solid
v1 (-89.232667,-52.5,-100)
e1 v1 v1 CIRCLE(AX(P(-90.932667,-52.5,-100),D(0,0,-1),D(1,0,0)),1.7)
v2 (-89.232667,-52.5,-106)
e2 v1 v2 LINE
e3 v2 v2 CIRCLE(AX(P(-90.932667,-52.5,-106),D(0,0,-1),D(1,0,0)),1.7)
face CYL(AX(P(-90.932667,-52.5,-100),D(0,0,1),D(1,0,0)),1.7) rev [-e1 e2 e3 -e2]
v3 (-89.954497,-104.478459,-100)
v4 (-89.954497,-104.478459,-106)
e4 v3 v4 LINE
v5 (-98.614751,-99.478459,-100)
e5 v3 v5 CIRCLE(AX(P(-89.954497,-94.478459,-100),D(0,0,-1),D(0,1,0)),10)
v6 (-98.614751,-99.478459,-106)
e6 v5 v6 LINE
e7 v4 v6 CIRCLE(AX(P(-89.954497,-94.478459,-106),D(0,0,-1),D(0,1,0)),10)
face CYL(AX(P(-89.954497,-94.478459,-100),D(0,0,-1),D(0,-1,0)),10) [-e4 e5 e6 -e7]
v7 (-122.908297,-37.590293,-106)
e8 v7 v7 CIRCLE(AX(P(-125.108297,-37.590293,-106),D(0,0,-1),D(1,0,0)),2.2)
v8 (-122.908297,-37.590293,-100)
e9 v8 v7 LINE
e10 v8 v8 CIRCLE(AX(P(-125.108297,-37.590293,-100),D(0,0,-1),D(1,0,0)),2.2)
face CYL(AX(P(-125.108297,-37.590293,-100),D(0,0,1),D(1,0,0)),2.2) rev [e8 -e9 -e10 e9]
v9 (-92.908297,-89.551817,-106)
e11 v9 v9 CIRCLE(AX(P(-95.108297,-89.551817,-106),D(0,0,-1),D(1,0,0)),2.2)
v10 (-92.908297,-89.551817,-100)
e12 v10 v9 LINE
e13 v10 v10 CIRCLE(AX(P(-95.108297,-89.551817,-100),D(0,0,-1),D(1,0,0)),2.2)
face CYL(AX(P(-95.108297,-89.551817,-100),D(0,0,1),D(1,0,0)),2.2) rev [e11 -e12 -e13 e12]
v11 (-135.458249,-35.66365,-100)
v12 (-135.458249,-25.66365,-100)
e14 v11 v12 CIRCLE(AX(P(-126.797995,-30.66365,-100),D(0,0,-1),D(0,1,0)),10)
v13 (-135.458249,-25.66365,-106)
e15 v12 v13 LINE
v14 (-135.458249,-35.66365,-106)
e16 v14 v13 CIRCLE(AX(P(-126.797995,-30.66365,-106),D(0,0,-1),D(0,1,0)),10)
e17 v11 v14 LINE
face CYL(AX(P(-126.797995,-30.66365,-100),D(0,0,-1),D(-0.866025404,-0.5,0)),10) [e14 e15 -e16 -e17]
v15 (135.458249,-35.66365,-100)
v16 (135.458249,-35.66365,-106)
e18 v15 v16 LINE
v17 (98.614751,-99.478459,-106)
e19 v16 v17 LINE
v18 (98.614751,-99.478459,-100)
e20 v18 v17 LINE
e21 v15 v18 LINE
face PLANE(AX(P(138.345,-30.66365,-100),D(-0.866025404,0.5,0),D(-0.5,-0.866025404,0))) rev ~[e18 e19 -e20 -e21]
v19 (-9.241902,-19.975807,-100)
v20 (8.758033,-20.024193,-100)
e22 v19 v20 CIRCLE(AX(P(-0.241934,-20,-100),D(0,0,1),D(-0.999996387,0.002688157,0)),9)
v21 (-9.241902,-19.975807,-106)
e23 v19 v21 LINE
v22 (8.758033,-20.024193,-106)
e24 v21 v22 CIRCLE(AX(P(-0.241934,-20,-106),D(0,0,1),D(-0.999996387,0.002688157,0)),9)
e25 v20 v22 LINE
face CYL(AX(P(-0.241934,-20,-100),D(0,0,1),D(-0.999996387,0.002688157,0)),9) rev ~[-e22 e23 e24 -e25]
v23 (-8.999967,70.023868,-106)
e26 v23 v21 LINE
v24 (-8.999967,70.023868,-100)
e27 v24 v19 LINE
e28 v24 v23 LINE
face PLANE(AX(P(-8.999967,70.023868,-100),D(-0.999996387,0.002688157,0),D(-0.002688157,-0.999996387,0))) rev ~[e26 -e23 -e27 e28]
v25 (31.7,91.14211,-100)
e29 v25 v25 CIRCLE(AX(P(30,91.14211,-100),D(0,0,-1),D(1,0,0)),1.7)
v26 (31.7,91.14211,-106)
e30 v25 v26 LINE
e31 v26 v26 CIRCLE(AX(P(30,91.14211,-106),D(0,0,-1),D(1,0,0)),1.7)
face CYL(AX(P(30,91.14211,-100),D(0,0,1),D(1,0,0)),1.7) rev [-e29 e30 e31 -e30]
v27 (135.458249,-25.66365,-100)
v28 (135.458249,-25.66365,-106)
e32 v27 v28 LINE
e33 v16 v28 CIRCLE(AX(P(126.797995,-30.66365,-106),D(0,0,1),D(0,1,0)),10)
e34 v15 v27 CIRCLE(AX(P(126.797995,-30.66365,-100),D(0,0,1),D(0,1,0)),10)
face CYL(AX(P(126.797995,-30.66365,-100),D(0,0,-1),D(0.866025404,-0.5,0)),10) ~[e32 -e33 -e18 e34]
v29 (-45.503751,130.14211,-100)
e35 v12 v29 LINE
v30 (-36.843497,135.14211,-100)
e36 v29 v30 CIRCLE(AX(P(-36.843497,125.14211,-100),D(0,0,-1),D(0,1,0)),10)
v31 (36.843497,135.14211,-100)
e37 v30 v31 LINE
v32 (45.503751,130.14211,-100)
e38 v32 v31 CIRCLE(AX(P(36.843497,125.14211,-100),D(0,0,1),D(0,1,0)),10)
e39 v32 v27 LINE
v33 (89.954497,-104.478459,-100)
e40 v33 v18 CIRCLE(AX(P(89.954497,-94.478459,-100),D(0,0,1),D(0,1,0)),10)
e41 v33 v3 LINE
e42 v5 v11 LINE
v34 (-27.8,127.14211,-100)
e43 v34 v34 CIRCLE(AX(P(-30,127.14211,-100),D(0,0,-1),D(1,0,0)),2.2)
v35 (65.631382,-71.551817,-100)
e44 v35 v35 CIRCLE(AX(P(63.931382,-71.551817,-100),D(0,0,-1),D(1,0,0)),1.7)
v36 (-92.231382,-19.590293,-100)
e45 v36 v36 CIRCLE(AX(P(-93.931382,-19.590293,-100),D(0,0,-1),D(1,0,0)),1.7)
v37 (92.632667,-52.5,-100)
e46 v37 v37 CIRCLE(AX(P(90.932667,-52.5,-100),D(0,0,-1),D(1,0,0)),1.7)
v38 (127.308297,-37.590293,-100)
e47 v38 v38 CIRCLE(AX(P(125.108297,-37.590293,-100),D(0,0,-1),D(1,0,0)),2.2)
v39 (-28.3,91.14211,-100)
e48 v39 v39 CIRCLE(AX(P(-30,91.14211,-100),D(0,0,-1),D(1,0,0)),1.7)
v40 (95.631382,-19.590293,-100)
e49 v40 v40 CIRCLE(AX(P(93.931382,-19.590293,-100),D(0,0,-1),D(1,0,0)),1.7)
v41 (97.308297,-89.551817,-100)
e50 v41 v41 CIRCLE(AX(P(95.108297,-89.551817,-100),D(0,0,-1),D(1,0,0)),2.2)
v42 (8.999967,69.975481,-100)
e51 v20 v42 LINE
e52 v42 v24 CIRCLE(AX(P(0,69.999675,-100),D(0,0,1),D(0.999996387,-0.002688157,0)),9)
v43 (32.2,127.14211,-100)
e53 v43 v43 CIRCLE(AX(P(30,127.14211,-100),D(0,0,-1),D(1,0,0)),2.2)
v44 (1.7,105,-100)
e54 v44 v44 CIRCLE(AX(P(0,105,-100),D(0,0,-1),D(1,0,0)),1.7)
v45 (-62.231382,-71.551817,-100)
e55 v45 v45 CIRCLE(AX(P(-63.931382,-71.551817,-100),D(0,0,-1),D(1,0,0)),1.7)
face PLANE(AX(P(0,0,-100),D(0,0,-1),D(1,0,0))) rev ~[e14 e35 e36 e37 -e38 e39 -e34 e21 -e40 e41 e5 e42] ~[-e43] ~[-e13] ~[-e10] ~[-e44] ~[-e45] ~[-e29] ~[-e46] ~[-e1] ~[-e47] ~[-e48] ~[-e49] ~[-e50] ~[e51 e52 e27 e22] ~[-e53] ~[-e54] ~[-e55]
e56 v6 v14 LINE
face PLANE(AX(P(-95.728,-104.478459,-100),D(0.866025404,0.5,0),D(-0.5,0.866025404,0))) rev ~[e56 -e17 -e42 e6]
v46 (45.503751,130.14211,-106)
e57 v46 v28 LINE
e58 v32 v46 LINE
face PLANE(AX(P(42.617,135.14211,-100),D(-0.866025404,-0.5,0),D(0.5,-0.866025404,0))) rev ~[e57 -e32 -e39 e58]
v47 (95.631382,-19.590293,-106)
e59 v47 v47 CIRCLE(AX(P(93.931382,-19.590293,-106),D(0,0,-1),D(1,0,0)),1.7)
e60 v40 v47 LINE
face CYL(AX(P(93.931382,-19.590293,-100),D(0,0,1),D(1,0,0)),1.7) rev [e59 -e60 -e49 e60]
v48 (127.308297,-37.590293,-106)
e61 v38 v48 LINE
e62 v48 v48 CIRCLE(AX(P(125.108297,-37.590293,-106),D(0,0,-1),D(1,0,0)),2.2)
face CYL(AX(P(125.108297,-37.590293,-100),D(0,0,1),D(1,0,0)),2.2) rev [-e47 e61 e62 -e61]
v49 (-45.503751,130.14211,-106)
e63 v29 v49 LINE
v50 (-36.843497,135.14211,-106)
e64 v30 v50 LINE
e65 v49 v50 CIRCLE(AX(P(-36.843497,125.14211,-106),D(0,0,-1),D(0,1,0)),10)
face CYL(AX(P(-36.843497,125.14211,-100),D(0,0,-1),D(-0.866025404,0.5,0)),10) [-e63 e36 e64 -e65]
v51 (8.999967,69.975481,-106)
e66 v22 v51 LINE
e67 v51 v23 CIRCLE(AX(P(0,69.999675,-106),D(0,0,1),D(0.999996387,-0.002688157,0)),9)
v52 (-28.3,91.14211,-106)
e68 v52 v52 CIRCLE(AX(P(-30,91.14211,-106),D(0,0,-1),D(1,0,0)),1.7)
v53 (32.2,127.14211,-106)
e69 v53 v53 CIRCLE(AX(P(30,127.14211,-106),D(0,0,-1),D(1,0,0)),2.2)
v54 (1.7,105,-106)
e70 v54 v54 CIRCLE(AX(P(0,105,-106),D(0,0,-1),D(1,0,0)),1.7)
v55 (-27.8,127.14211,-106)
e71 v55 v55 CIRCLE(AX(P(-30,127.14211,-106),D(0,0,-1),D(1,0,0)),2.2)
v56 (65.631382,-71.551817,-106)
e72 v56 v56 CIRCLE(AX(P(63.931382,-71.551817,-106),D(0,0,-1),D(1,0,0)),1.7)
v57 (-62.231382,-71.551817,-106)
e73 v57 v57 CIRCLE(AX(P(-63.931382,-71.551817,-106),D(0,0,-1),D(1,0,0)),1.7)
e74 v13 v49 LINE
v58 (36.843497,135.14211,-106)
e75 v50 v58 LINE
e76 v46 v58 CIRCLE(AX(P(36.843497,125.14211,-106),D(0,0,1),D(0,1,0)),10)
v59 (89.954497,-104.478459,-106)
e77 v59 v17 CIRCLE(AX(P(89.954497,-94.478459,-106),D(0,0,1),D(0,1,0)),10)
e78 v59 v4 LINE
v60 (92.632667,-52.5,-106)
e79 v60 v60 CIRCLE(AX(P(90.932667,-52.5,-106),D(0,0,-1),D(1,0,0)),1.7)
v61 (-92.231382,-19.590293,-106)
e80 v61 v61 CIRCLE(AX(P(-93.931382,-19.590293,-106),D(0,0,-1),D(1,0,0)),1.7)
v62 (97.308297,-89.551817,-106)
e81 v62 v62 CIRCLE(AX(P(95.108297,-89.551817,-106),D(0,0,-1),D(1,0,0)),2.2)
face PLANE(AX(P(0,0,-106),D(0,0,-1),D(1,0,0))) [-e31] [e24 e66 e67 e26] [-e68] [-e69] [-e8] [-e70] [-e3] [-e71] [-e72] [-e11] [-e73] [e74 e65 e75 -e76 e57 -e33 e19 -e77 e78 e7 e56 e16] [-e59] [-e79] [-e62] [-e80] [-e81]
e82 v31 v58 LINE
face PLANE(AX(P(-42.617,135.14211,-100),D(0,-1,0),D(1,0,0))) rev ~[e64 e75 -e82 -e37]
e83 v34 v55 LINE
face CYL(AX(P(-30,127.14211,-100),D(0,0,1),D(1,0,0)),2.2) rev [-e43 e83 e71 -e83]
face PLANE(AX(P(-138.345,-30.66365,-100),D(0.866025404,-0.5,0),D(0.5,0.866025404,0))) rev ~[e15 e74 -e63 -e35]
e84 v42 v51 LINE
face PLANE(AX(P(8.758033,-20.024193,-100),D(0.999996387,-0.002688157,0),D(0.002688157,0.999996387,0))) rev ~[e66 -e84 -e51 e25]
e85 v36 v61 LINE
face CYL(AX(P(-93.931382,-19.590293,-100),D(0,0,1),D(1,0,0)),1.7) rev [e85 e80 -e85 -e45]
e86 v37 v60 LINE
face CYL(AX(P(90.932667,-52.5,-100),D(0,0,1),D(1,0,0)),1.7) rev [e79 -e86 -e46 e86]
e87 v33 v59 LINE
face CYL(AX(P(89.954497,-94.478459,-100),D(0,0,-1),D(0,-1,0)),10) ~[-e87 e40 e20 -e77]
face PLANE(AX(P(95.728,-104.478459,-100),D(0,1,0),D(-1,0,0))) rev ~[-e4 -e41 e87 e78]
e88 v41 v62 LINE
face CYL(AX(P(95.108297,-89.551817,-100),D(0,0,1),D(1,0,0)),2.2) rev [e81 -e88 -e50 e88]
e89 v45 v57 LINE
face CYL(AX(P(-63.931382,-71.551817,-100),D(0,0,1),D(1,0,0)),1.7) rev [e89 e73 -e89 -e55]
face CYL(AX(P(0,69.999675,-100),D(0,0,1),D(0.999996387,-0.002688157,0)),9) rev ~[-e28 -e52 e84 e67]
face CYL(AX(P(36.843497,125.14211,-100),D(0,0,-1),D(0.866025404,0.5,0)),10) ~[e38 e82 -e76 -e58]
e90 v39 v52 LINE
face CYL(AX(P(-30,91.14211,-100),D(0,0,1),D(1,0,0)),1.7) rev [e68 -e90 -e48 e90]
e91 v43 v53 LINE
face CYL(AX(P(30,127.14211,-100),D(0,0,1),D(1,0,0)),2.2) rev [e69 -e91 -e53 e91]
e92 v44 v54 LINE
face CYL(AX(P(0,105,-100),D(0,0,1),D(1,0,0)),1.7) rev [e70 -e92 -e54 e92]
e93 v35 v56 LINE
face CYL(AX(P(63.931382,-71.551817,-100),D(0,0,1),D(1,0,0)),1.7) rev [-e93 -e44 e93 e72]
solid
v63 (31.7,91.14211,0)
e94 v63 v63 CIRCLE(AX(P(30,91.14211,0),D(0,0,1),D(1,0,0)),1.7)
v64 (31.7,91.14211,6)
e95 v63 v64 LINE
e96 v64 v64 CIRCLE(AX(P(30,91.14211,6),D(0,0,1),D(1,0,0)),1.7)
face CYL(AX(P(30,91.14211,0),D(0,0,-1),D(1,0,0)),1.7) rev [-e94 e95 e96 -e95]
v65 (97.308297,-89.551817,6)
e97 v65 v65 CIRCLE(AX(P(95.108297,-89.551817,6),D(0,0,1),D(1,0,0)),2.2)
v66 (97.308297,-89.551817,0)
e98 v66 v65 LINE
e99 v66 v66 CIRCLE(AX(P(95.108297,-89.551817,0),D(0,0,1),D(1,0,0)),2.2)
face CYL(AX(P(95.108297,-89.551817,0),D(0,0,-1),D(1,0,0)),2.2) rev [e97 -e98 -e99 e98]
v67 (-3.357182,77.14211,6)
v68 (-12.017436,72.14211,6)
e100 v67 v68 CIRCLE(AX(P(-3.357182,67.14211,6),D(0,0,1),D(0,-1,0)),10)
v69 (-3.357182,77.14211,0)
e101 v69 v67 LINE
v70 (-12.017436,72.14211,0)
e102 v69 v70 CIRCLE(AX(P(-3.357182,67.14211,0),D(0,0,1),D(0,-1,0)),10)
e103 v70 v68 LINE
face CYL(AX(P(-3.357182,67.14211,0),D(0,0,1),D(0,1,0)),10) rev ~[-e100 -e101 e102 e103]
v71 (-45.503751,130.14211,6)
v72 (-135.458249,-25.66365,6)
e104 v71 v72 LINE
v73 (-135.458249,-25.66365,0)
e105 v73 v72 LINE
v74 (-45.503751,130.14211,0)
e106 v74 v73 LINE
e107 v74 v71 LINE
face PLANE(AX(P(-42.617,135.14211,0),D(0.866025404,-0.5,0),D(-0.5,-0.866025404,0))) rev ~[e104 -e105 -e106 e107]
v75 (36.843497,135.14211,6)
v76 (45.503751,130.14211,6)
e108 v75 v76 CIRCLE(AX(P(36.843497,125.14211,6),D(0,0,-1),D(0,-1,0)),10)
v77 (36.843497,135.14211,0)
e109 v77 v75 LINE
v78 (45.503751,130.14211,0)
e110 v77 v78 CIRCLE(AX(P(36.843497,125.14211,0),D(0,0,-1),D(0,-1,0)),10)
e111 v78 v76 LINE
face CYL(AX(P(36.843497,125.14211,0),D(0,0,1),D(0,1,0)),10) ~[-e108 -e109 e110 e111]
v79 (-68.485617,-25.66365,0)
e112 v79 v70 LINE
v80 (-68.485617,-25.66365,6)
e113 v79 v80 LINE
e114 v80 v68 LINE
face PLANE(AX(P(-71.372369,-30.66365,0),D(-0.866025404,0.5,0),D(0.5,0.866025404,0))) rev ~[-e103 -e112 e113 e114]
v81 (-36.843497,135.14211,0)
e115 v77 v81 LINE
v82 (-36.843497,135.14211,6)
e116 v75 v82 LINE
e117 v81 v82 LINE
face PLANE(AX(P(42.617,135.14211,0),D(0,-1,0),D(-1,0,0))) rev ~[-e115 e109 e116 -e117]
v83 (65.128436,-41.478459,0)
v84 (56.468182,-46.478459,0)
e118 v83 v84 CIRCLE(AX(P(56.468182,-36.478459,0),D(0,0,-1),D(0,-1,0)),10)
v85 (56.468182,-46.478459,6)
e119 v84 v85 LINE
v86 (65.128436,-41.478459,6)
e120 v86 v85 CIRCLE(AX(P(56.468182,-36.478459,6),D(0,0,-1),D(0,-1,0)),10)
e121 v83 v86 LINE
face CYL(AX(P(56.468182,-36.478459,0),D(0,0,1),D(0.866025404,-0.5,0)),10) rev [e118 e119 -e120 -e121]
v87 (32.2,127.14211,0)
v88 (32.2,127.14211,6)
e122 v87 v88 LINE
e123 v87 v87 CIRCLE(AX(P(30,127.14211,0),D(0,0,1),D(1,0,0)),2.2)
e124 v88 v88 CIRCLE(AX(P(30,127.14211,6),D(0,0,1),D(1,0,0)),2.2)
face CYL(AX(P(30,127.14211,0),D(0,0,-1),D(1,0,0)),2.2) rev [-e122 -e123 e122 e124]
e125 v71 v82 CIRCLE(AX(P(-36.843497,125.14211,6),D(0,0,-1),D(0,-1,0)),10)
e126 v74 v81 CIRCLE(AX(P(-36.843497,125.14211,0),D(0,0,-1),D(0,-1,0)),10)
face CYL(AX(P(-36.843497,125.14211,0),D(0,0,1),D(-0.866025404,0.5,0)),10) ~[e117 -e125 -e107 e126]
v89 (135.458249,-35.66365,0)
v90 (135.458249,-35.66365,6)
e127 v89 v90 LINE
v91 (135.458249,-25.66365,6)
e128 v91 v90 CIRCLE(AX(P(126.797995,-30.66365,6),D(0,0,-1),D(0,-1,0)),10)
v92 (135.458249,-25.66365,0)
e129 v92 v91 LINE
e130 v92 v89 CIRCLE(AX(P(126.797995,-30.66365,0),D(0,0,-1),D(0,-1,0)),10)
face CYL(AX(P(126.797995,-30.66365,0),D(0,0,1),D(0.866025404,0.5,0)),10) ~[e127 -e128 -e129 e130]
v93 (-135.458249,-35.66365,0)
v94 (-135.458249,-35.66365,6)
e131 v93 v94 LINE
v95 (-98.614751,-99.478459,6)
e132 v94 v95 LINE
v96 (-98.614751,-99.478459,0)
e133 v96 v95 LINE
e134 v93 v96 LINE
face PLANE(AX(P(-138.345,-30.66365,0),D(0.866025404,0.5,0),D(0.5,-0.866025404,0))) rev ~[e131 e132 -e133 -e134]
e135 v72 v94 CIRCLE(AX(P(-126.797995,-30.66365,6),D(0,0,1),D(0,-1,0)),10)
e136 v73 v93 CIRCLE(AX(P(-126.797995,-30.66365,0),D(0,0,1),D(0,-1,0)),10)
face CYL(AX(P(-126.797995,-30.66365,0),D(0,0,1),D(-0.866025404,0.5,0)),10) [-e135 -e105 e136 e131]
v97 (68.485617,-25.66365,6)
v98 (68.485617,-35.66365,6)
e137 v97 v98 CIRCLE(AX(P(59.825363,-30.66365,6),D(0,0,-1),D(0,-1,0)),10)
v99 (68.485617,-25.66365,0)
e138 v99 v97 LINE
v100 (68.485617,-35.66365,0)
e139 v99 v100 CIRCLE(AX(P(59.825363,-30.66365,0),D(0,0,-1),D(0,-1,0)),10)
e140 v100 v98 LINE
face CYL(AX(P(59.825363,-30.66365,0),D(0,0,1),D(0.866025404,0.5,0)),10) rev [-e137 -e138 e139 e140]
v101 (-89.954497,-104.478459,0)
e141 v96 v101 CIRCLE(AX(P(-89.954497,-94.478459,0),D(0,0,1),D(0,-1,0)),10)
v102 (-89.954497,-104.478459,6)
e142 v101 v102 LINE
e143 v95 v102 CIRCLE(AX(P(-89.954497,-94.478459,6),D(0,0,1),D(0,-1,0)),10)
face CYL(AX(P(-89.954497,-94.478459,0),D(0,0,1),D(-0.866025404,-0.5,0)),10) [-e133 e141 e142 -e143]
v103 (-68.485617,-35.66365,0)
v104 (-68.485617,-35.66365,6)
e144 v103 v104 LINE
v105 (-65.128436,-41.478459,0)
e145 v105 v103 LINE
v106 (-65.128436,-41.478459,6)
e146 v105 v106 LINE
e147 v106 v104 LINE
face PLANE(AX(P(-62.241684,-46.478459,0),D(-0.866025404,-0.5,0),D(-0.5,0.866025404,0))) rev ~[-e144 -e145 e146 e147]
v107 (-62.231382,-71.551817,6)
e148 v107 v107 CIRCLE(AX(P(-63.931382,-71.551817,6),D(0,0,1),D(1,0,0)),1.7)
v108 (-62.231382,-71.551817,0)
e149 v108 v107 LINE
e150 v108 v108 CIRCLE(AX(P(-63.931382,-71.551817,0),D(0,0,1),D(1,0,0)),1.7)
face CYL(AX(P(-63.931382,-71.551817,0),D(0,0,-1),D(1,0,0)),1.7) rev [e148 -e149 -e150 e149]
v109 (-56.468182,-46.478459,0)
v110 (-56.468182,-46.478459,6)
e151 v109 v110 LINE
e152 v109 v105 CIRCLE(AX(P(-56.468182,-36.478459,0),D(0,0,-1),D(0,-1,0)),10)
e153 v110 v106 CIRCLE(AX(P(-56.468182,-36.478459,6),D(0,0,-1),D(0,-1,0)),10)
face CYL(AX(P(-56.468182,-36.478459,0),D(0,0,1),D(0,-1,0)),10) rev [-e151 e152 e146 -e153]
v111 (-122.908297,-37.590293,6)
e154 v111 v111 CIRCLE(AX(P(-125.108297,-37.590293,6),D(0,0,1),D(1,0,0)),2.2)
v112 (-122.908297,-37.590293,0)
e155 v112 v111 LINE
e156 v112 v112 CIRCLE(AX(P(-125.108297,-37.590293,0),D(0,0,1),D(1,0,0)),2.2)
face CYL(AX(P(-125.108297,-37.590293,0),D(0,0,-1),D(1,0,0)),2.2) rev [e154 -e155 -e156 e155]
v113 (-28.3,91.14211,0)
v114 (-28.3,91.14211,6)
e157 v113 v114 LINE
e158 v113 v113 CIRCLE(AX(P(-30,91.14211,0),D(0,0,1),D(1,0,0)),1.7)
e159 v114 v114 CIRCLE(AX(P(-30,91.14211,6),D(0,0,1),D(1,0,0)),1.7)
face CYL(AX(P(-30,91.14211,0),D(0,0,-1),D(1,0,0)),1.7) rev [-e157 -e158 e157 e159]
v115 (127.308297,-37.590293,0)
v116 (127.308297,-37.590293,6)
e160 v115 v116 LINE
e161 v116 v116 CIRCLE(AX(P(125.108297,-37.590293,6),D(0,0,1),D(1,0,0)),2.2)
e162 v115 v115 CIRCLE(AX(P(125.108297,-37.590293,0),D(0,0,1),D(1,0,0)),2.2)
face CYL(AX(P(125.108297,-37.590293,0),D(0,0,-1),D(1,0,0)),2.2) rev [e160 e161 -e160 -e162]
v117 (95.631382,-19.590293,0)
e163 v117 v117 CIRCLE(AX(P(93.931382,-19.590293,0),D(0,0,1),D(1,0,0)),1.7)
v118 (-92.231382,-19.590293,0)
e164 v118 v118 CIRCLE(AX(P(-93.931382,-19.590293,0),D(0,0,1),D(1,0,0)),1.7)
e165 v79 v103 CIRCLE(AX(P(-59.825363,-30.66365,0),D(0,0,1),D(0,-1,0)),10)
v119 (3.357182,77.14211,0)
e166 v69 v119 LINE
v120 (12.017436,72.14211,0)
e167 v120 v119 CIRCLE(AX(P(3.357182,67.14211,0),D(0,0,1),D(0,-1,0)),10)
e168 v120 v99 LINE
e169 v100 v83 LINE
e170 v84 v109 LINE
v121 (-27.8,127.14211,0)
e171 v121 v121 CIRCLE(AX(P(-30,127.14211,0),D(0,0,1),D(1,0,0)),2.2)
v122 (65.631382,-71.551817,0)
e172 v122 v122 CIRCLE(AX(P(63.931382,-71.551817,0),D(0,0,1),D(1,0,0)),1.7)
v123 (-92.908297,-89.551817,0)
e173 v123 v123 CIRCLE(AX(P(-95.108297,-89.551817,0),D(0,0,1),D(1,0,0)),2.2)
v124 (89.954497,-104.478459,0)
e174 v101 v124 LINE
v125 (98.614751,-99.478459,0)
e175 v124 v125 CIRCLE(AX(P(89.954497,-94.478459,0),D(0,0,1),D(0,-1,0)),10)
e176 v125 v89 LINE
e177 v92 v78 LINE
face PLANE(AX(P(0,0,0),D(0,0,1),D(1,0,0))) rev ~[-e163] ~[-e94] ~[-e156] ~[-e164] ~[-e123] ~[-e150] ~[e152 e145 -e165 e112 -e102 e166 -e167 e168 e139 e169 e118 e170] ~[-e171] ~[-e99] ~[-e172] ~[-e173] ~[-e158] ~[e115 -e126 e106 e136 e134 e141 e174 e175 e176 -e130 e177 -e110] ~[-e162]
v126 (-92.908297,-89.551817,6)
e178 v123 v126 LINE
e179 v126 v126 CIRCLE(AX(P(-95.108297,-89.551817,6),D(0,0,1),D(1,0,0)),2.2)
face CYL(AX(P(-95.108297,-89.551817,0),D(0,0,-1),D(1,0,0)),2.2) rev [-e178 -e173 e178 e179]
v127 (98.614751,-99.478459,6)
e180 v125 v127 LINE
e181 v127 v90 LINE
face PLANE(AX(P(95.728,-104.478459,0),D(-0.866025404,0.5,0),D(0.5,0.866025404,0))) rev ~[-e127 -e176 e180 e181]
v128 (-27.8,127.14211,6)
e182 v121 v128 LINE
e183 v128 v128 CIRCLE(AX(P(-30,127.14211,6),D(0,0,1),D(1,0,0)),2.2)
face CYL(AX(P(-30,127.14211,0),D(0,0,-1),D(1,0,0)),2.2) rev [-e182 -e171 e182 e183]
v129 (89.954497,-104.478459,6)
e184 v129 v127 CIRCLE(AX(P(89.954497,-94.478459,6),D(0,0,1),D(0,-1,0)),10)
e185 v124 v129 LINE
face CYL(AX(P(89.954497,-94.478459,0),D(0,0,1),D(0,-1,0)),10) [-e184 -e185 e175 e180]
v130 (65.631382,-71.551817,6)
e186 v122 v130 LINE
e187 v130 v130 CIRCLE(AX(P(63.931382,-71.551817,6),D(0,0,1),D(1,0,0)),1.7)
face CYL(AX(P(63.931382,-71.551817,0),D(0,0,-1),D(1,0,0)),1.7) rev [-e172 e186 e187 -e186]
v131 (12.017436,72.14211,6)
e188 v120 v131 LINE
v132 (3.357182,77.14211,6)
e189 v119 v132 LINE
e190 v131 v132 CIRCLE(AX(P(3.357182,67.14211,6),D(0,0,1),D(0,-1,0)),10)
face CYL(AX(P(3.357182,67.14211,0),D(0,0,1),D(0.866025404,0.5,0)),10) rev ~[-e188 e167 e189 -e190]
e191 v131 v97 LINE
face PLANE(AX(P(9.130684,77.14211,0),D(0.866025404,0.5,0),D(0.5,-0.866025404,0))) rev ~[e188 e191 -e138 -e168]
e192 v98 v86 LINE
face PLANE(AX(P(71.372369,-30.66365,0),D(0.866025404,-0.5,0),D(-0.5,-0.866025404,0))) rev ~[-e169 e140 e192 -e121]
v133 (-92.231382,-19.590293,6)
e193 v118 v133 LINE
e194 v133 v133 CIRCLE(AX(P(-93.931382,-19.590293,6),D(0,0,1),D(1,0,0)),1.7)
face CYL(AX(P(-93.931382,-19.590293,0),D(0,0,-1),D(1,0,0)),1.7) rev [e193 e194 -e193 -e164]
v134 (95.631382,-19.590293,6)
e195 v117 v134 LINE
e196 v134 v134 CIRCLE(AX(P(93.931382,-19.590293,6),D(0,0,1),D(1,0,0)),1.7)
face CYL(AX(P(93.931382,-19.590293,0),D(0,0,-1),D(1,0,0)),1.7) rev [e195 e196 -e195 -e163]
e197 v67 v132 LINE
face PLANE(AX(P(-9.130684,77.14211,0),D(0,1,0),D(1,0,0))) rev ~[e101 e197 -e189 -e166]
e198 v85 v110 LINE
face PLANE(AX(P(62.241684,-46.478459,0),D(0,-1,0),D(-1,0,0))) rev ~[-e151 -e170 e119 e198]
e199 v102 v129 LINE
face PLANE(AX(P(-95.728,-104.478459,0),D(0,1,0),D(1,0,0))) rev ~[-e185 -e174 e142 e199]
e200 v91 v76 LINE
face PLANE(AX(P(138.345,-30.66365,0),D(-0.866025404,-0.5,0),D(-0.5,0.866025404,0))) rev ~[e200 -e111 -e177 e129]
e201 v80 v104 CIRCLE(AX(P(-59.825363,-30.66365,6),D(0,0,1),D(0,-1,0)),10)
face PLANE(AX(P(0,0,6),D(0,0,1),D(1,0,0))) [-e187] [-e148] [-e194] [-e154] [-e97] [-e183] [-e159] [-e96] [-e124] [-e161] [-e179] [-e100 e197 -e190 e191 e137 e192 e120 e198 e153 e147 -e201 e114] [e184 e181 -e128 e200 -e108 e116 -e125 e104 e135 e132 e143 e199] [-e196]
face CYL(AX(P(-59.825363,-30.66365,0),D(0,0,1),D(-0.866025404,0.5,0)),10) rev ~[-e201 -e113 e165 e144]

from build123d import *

# Parameters (mm, degrees)
F0_R     = 2.2
F0_R_2   = 1.7
F1_DEPTH = 6
F3_R     = 2.2
F3_R_2   = 1.7
F4_DEPTH = 6
F5_R     = 10
F5_2_R   = 10


# Not quite as in the source:
# - a feature names something its author has since deleted; it is built from what else it names


with BuildPart() as f1:
    # F0 (on Top) → F1 (new body)
    with BuildSketch(Plane.XY):
        Polygon((-42.617, 135.14210956), (-138.345, -30.6636501469), (-95.728, -104.4784594131), (95.728, -104.4784594131), (138.345, -30.6636501469), (42.617, 135.14210956), align=None)
        with Locations((-95.1082967697, -89.5518168935)):
            Circle(F0_R, mode=Mode.SUBTRACT)
        with Locations((-63.9313822335, -71.5518168935)):
            Circle(F0_R_2, mode=Mode.SUBTRACT)
        with Locations((-125.1082967697, -37.5902926665)):
            Circle(F0_R, mode=Mode.SUBTRACT)
        with Locations((-93.9313822335, -19.5902926665)):
            Circle(F0_R_2, mode=Mode.SUBTRACT)
        Polygon((71.372368774, -30.6636501469), (62.241684387, -46.4784594131), (-62.241684387, -46.4784594131), (-71.372368774, -30.6636501469), (-9.130684387, 77.14210956), (9.130684387, 77.14210956), align=None, mode=Mode.SUBTRACT)
        with Locations((63.9313822335, -71.5518168935)):
            Circle(F0_R_2, mode=Mode.SUBTRACT)
        with Locations((95.1082967697, -89.5518168935)):
            Circle(F0_R, mode=Mode.SUBTRACT)
        with Locations((93.9313822335, -19.5902926665)):
            Circle(F0_R_2, mode=Mode.SUBTRACT)
        with Locations((125.1082967697, -37.5902926665)):
            Circle(F0_R, mode=Mode.SUBTRACT)
        with Locations((-30, 91.14210956)):
            Circle(F0_R_2, mode=Mode.SUBTRACT)
        with Locations((-30, 127.14210956)):
            Circle(F0_R, mode=Mode.SUBTRACT)
        with Locations((30, 91.14210956)):
            Circle(F0_R_2, mode=Mode.SUBTRACT)
        with Locations((30, 127.14210956)):
            Circle(F0_R, mode=Mode.SUBTRACT)
    extrude(amount=F1_DEPTH)

    # F5
    f5_edges = [f1.edges().sort_by_distance(p)[0] for p in [
        (-95.728, -104.478459, 3),
        (-138.345, -30.66365, 3),
        (95.728, -104.478459, 3),
        (138.345, -30.66365, 3),
        (-42.617, 135.14211, 3),
        (42.617, 135.14211, 3),
        (-71.372369, -30.66365, 3),
        (-62.241684, -46.478459, 3),
        (-9.130684, 77.14211, 3),
        (9.130684, 77.14211, 3),
        (71.372369, -30.66365, 3),
        (62.241684, -46.478459, 3),
    ]]
    fillet(f5_edges, radius=F5_R)


with BuildPart() as f4:
    # F3 (on offset) → F4 (new body)
    with BuildSketch(Plane(origin=(0, 0, -100), x_dir=(1, 0, 0), z_dir=(0, 0, -1))):
        Polygon((95.728, 104.4784594131), (-95.728, 104.4784594131), (-138.345, 30.6636501469), (-42.617, -135.14210956), (42.617, -135.14210956), (138.345, 30.6636501469), align=None)
        with Locations((-30, -127.14210956)):
            Circle(F3_R, mode=Mode.SUBTRACT)
        with Locations((-30, -91.14210956)):
            Circle(F3_R_2, mode=Mode.SUBTRACT)
        with Locations((0, -105)):
            Circle(F3_R_2, mode=Mode.SUBTRACT)
        with BuildLine():
            Line((8.7580333745, 20.0241934108), (8.9999674821, -69.9754814103))
            ThreePointArc((8.9999674821, -69.9754814103), (0.0241934108, -78.9996423031), (-8.9999674821, -70.0238682318))
            Line((-8.9999674821, -70.0238682318), (-9.2419015897, 19.9758065892))
            ThreePointArc((-9.2419015897, 19.9758065892), (-0.2661275183, 28.9999674821), (8.7580333745, 20.0241934108))
        make_face(mode=Mode.SUBTRACT)
        with Locations((30, -127.14210956)):
            Circle(F3_R, mode=Mode.SUBTRACT)
        with Locations((30, -91.14210956)):
            Circle(F3_R_2, mode=Mode.SUBTRACT)
        with Locations((-125.1082967697, 37.5902926665)):
            Circle(F3_R, mode=Mode.SUBTRACT)
        with Locations((-93.9313822335, 19.5902926665)):
            Circle(F3_R_2, mode=Mode.SUBTRACT)
        with Locations((-90.9326673974, 52.5)):
            Circle(F3_R_2, mode=Mode.SUBTRACT)
        with Locations((-95.1082967697, 89.5518168935)):
            Circle(F3_R, mode=Mode.SUBTRACT)
        with Locations((-63.9313822335, 71.5518168935)):
            Circle(F3_R_2, mode=Mode.SUBTRACT)
        with Locations((93.9313822335, 19.5902926665)):
            Circle(F3_R_2, mode=Mode.SUBTRACT)
        with Locations((125.1082967697, 37.5902926665)):
            Circle(F3_R, mode=Mode.SUBTRACT)
        with Locations((63.9313822335, 71.5518168935)):
            Circle(F3_R_2, mode=Mode.SUBTRACT)
        with Locations((90.9326673974, 52.5)):
            Circle(F3_R_2, mode=Mode.SUBTRACT)
        with Locations((95.1082967697, 89.5518168935)):
            Circle(F3_R, mode=Mode.SUBTRACT)
    extrude(amount=F4_DEPTH)

    # F5#2
    f5_2_edges = [f4.edges().sort_by_distance(p)[0] for p in [
        (95.728, -104.478459, -103),
        (138.345, -30.66365, -103),
        (-95.728, -104.478459, -103),
        (-138.345, -30.66365, -103),
        (-42.617, 135.14211, -103),
        (42.617, 135.14211, -103),
    ]]
    fillet(f5_2_edges, radius=F5_2_R)


solid = Compound([f1.part, f4.part])
